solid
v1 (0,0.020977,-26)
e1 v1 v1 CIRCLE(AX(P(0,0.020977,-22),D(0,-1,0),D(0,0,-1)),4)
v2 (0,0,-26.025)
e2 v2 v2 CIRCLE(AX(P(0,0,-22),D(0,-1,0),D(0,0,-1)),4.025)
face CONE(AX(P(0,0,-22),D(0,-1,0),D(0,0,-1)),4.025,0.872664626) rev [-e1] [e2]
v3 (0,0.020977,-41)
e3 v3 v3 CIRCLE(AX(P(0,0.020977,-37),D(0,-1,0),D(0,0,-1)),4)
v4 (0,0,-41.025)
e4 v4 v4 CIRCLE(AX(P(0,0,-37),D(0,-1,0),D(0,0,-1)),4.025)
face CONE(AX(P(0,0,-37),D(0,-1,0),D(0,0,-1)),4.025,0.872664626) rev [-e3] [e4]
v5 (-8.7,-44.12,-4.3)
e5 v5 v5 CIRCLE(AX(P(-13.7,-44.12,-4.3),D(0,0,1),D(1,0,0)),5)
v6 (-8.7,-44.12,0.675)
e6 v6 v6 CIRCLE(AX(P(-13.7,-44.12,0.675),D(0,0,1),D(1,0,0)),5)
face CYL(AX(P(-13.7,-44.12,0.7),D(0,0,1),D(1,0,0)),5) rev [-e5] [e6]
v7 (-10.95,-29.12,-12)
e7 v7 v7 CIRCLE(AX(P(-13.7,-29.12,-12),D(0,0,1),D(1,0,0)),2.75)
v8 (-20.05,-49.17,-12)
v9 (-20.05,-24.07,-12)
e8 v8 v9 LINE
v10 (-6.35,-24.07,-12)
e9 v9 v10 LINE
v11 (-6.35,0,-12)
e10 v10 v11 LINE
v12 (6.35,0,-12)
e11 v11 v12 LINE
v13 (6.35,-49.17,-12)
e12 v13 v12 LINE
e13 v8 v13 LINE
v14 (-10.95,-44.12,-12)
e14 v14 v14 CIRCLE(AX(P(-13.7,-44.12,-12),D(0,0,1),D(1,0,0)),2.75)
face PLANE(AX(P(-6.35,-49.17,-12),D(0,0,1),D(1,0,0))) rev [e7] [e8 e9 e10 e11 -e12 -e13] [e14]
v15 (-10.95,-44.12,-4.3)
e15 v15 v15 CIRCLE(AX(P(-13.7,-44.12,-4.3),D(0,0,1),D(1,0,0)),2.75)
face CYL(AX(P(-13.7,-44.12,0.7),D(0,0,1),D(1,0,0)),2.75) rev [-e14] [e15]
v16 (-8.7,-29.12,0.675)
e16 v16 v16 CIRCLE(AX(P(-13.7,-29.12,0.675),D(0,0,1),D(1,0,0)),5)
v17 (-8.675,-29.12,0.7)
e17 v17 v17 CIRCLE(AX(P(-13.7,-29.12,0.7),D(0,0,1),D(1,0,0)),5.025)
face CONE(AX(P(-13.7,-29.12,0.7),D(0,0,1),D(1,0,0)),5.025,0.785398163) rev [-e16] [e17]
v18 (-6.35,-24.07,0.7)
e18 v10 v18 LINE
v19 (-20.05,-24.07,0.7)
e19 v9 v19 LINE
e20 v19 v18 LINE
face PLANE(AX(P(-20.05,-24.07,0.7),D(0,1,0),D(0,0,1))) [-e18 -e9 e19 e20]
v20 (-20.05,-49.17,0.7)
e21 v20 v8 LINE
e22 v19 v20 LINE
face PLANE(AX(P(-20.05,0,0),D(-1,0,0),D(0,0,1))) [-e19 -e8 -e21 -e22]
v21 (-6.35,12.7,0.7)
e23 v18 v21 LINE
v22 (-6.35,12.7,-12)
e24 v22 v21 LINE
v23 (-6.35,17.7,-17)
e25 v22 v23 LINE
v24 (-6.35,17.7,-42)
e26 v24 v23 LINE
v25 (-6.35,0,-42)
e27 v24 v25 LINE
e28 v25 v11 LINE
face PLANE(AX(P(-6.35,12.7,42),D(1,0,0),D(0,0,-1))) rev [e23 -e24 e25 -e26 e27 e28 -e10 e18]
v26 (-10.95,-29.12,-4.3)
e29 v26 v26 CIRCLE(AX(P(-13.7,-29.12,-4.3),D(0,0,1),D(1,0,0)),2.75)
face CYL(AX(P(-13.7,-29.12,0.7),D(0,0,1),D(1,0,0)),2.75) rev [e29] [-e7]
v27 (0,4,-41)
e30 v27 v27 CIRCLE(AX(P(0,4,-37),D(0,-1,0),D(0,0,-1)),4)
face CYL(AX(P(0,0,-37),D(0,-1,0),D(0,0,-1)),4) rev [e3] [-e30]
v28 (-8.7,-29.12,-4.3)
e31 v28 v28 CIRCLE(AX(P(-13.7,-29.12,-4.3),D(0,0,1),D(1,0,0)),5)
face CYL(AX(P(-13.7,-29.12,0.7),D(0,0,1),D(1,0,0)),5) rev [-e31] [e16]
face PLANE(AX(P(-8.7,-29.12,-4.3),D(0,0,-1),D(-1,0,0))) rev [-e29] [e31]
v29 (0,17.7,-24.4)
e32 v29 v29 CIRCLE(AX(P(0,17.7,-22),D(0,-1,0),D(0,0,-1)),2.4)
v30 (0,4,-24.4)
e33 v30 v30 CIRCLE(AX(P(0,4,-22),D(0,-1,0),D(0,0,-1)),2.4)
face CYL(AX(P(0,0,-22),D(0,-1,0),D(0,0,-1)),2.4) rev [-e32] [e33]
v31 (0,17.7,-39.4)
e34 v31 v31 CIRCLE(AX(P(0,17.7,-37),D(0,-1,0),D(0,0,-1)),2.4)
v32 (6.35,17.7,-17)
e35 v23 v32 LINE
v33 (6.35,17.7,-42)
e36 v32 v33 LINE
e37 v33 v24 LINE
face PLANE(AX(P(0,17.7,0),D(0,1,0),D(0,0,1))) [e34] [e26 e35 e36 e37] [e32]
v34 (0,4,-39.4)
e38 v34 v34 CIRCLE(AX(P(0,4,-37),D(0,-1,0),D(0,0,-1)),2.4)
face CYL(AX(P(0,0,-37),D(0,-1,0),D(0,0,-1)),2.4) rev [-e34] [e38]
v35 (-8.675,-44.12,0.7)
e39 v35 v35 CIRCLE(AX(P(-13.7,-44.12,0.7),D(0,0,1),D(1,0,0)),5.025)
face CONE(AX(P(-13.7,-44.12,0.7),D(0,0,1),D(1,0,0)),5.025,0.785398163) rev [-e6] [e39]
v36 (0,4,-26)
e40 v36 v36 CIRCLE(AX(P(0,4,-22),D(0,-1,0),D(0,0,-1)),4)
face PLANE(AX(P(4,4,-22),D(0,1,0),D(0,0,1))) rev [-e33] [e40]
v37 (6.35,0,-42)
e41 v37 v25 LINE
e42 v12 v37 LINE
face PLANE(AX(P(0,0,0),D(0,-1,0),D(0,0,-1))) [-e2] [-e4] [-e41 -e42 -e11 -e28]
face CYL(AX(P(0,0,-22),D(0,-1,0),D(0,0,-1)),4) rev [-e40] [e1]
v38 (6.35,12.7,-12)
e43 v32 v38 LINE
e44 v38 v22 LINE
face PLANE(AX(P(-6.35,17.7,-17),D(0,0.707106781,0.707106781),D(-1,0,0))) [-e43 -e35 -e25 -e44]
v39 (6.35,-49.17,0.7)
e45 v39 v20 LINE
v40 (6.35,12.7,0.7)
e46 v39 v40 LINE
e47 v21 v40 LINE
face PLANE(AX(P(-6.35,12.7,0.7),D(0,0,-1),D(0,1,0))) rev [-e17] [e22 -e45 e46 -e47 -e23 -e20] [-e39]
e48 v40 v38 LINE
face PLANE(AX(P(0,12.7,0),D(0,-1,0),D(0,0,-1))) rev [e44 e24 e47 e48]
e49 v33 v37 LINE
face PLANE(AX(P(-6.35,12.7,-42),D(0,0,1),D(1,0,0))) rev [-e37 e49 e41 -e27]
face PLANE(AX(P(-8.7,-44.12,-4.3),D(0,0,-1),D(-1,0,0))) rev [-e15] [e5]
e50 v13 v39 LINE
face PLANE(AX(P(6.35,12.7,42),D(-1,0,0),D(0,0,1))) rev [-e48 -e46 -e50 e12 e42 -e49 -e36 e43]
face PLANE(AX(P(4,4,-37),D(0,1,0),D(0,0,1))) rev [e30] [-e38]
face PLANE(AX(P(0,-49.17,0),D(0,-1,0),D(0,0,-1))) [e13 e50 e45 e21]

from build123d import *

# Parameters (mm, degrees)
SKETCH2_W                     = 12.7
SKETCH2_H                     = 84
BOSS_EXTRUDE1_DEPTH           = 12.7
SKETCH5_W                     = 12.7
SKETCH5_H                     = 25
BOSS_EXTRUDE2_DEPTH           = 5
CBORE_FOR_M4_SHCS1_AT_2_COUNT = 2
CBORE_FOR_M4_SHCS1_AT_2_PITCH = 15
CHAMFER1_SIZE                 = 5
SKETCH6_W                     = 41.3
SKETCH6_H                     = 12.7
CUT_EXTRUDE1_DEPTH            = 48.313634399
SKETCH7_W                     = 12.7
SKETCH7_H                     = 12.7
BOSS_EXTRUDE3_DEPTH           = 49.17
SKETCH9_W                     = 12.7
SKETCH9_H                     = 25.1
BOSS_EXTRUDE4_DEPTH           = 13.7
CBORE_FOR_M5_SHCS2_AT_2_COUNT = 2
CBORE_FOR_M5_SHCS2_AT_2_PITCH = 15


with BuildPart() as part:
    # Sketch2 → Boss-Extrude1 (new body)
    with BuildSketch(Plane(origin=(0, 0, 0), x_dir=(1, 0, 0), z_dir=(0, 1, 0))):
        Rectangle(SKETCH2_W, SKETCH2_H)
    extrude(amount=BOSS_EXTRUDE1_DEPTH)

    # Sketch5 → Boss-Extrude2 (add)
    with BuildSketch(Plane(origin=(0, 12.7, 0), x_dir=(1, 0, 0), z_dir=(0, 1, 0))):
        with Locations((0, 29.5)):
            Rectangle(SKETCH5_W, SKETCH5_H)
    extrude(amount=BOSS_EXTRUDE2_DEPTH)

    # Sketch4 → CBORE for M4 SHCS1 (revolve, cut)
    with BuildSketch(Plane(origin=(0, 0, -37), x_dir=(0, 0, -1), z_dir=(1, 0, 0))):
        Polygon((0, 0), (0, 17.7), (2.4, 17.7), (2.4, 4), (4, 4), (4, 0.020977491), (4.025, 0), align=None)
    cbore_for_m4_shcs1 = revolve(axis=Axis((0, -6.35, -37), (0, 1, 0)), mode=Mode.SUBTRACT)

    # CBORE for M4 SHCS1 at 2: CBORE for M4 SHCS1 ×2
    with Locations(*[(0, 0, i * CBORE_FOR_M4_SHCS1_AT_2_PITCH) for i in range(1, CBORE_FOR_M4_SHCS1_AT_2_COUNT)]):
        add(cbore_for_m4_shcs1, mode=Mode.SUBTRACT)

    # Chamfer1
    chamfer1_edges = [part.edges().sort_by_distance(p)[0] for p in [
        (0, 12.7, -17),
    ]]
    chamfer(chamfer1_edges, length=CHAMFER1_SIZE - 0.0001)  # a hair under: the kernel refuses the full size

    # Sketch6 → Cut-Extrude1 (cut, through all)
    with BuildSketch(Plane(origin=(6.35, 0, 0), x_dir=(0, 0, -1), z_dir=(1, 0, 0))):
        with Locations((-21.35, 6.35)):
            Rectangle(SKETCH6_W, SKETCH6_H)
    extrude(amount=-CUT_EXTRUDE1_DEPTH, mode=Mode.SUBTRACT)

    # Sketch7 → Boss-Extrude3 (add)
    with BuildSketch(Plane(origin=(0, 0, 0), x_dir=(-1, 0, 0), z_dir=(0, -1, 0))):
        with Locations((0, 5.65)):
            Rectangle(SKETCH7_W, SKETCH7_H)
    extrude(amount=BOSS_EXTRUDE3_DEPTH)

    # Sketch9 → Boss-Extrude4 (add)
    with BuildSketch(Plane(origin=(-6.35, 0, 0), x_dir=(0, 0, -1), z_dir=(1, 0, 0))):
        with Locations((5.65, -36.62)):
            Rectangle(SKETCH9_W, SKETCH9_H)
    extrude(amount=-BOSS_EXTRUDE4_DEPTH)

    # Sketch14 → CBORE for M5 SHCS2 (revolve, cut)
    with BuildSketch(Plane(origin=(-13.7, -29.12, 0.7), x_dir=(0, -1, 0), z_dir=(1, 0, 0))):
        Polygon((0, 0), (0, 42.7), (2.75, 42.7), (2.75, 5), (5, 5), (5, 0.025), (5.025, 0), align=None)
    cbore_for_m5_shcs2 = revolve(axis=Axis((-13.7, -29.12, 7.05), (0, 0, -1)), mode=Mode.SUBTRACT)

    # CBORE for M5 SHCS2 at 2: CBORE for M5 SHCS2 ×2
    with Locations(*[(0, -i * CBORE_FOR_M5_SHCS2_AT_2_PITCH, 0) for i in range(1, CBORE_FOR_M5_SHCS2_AT_2_COUNT)]):
        add(cbore_for_m5_shcs2, mode=Mode.SUBTRACT)


solid = part.part
